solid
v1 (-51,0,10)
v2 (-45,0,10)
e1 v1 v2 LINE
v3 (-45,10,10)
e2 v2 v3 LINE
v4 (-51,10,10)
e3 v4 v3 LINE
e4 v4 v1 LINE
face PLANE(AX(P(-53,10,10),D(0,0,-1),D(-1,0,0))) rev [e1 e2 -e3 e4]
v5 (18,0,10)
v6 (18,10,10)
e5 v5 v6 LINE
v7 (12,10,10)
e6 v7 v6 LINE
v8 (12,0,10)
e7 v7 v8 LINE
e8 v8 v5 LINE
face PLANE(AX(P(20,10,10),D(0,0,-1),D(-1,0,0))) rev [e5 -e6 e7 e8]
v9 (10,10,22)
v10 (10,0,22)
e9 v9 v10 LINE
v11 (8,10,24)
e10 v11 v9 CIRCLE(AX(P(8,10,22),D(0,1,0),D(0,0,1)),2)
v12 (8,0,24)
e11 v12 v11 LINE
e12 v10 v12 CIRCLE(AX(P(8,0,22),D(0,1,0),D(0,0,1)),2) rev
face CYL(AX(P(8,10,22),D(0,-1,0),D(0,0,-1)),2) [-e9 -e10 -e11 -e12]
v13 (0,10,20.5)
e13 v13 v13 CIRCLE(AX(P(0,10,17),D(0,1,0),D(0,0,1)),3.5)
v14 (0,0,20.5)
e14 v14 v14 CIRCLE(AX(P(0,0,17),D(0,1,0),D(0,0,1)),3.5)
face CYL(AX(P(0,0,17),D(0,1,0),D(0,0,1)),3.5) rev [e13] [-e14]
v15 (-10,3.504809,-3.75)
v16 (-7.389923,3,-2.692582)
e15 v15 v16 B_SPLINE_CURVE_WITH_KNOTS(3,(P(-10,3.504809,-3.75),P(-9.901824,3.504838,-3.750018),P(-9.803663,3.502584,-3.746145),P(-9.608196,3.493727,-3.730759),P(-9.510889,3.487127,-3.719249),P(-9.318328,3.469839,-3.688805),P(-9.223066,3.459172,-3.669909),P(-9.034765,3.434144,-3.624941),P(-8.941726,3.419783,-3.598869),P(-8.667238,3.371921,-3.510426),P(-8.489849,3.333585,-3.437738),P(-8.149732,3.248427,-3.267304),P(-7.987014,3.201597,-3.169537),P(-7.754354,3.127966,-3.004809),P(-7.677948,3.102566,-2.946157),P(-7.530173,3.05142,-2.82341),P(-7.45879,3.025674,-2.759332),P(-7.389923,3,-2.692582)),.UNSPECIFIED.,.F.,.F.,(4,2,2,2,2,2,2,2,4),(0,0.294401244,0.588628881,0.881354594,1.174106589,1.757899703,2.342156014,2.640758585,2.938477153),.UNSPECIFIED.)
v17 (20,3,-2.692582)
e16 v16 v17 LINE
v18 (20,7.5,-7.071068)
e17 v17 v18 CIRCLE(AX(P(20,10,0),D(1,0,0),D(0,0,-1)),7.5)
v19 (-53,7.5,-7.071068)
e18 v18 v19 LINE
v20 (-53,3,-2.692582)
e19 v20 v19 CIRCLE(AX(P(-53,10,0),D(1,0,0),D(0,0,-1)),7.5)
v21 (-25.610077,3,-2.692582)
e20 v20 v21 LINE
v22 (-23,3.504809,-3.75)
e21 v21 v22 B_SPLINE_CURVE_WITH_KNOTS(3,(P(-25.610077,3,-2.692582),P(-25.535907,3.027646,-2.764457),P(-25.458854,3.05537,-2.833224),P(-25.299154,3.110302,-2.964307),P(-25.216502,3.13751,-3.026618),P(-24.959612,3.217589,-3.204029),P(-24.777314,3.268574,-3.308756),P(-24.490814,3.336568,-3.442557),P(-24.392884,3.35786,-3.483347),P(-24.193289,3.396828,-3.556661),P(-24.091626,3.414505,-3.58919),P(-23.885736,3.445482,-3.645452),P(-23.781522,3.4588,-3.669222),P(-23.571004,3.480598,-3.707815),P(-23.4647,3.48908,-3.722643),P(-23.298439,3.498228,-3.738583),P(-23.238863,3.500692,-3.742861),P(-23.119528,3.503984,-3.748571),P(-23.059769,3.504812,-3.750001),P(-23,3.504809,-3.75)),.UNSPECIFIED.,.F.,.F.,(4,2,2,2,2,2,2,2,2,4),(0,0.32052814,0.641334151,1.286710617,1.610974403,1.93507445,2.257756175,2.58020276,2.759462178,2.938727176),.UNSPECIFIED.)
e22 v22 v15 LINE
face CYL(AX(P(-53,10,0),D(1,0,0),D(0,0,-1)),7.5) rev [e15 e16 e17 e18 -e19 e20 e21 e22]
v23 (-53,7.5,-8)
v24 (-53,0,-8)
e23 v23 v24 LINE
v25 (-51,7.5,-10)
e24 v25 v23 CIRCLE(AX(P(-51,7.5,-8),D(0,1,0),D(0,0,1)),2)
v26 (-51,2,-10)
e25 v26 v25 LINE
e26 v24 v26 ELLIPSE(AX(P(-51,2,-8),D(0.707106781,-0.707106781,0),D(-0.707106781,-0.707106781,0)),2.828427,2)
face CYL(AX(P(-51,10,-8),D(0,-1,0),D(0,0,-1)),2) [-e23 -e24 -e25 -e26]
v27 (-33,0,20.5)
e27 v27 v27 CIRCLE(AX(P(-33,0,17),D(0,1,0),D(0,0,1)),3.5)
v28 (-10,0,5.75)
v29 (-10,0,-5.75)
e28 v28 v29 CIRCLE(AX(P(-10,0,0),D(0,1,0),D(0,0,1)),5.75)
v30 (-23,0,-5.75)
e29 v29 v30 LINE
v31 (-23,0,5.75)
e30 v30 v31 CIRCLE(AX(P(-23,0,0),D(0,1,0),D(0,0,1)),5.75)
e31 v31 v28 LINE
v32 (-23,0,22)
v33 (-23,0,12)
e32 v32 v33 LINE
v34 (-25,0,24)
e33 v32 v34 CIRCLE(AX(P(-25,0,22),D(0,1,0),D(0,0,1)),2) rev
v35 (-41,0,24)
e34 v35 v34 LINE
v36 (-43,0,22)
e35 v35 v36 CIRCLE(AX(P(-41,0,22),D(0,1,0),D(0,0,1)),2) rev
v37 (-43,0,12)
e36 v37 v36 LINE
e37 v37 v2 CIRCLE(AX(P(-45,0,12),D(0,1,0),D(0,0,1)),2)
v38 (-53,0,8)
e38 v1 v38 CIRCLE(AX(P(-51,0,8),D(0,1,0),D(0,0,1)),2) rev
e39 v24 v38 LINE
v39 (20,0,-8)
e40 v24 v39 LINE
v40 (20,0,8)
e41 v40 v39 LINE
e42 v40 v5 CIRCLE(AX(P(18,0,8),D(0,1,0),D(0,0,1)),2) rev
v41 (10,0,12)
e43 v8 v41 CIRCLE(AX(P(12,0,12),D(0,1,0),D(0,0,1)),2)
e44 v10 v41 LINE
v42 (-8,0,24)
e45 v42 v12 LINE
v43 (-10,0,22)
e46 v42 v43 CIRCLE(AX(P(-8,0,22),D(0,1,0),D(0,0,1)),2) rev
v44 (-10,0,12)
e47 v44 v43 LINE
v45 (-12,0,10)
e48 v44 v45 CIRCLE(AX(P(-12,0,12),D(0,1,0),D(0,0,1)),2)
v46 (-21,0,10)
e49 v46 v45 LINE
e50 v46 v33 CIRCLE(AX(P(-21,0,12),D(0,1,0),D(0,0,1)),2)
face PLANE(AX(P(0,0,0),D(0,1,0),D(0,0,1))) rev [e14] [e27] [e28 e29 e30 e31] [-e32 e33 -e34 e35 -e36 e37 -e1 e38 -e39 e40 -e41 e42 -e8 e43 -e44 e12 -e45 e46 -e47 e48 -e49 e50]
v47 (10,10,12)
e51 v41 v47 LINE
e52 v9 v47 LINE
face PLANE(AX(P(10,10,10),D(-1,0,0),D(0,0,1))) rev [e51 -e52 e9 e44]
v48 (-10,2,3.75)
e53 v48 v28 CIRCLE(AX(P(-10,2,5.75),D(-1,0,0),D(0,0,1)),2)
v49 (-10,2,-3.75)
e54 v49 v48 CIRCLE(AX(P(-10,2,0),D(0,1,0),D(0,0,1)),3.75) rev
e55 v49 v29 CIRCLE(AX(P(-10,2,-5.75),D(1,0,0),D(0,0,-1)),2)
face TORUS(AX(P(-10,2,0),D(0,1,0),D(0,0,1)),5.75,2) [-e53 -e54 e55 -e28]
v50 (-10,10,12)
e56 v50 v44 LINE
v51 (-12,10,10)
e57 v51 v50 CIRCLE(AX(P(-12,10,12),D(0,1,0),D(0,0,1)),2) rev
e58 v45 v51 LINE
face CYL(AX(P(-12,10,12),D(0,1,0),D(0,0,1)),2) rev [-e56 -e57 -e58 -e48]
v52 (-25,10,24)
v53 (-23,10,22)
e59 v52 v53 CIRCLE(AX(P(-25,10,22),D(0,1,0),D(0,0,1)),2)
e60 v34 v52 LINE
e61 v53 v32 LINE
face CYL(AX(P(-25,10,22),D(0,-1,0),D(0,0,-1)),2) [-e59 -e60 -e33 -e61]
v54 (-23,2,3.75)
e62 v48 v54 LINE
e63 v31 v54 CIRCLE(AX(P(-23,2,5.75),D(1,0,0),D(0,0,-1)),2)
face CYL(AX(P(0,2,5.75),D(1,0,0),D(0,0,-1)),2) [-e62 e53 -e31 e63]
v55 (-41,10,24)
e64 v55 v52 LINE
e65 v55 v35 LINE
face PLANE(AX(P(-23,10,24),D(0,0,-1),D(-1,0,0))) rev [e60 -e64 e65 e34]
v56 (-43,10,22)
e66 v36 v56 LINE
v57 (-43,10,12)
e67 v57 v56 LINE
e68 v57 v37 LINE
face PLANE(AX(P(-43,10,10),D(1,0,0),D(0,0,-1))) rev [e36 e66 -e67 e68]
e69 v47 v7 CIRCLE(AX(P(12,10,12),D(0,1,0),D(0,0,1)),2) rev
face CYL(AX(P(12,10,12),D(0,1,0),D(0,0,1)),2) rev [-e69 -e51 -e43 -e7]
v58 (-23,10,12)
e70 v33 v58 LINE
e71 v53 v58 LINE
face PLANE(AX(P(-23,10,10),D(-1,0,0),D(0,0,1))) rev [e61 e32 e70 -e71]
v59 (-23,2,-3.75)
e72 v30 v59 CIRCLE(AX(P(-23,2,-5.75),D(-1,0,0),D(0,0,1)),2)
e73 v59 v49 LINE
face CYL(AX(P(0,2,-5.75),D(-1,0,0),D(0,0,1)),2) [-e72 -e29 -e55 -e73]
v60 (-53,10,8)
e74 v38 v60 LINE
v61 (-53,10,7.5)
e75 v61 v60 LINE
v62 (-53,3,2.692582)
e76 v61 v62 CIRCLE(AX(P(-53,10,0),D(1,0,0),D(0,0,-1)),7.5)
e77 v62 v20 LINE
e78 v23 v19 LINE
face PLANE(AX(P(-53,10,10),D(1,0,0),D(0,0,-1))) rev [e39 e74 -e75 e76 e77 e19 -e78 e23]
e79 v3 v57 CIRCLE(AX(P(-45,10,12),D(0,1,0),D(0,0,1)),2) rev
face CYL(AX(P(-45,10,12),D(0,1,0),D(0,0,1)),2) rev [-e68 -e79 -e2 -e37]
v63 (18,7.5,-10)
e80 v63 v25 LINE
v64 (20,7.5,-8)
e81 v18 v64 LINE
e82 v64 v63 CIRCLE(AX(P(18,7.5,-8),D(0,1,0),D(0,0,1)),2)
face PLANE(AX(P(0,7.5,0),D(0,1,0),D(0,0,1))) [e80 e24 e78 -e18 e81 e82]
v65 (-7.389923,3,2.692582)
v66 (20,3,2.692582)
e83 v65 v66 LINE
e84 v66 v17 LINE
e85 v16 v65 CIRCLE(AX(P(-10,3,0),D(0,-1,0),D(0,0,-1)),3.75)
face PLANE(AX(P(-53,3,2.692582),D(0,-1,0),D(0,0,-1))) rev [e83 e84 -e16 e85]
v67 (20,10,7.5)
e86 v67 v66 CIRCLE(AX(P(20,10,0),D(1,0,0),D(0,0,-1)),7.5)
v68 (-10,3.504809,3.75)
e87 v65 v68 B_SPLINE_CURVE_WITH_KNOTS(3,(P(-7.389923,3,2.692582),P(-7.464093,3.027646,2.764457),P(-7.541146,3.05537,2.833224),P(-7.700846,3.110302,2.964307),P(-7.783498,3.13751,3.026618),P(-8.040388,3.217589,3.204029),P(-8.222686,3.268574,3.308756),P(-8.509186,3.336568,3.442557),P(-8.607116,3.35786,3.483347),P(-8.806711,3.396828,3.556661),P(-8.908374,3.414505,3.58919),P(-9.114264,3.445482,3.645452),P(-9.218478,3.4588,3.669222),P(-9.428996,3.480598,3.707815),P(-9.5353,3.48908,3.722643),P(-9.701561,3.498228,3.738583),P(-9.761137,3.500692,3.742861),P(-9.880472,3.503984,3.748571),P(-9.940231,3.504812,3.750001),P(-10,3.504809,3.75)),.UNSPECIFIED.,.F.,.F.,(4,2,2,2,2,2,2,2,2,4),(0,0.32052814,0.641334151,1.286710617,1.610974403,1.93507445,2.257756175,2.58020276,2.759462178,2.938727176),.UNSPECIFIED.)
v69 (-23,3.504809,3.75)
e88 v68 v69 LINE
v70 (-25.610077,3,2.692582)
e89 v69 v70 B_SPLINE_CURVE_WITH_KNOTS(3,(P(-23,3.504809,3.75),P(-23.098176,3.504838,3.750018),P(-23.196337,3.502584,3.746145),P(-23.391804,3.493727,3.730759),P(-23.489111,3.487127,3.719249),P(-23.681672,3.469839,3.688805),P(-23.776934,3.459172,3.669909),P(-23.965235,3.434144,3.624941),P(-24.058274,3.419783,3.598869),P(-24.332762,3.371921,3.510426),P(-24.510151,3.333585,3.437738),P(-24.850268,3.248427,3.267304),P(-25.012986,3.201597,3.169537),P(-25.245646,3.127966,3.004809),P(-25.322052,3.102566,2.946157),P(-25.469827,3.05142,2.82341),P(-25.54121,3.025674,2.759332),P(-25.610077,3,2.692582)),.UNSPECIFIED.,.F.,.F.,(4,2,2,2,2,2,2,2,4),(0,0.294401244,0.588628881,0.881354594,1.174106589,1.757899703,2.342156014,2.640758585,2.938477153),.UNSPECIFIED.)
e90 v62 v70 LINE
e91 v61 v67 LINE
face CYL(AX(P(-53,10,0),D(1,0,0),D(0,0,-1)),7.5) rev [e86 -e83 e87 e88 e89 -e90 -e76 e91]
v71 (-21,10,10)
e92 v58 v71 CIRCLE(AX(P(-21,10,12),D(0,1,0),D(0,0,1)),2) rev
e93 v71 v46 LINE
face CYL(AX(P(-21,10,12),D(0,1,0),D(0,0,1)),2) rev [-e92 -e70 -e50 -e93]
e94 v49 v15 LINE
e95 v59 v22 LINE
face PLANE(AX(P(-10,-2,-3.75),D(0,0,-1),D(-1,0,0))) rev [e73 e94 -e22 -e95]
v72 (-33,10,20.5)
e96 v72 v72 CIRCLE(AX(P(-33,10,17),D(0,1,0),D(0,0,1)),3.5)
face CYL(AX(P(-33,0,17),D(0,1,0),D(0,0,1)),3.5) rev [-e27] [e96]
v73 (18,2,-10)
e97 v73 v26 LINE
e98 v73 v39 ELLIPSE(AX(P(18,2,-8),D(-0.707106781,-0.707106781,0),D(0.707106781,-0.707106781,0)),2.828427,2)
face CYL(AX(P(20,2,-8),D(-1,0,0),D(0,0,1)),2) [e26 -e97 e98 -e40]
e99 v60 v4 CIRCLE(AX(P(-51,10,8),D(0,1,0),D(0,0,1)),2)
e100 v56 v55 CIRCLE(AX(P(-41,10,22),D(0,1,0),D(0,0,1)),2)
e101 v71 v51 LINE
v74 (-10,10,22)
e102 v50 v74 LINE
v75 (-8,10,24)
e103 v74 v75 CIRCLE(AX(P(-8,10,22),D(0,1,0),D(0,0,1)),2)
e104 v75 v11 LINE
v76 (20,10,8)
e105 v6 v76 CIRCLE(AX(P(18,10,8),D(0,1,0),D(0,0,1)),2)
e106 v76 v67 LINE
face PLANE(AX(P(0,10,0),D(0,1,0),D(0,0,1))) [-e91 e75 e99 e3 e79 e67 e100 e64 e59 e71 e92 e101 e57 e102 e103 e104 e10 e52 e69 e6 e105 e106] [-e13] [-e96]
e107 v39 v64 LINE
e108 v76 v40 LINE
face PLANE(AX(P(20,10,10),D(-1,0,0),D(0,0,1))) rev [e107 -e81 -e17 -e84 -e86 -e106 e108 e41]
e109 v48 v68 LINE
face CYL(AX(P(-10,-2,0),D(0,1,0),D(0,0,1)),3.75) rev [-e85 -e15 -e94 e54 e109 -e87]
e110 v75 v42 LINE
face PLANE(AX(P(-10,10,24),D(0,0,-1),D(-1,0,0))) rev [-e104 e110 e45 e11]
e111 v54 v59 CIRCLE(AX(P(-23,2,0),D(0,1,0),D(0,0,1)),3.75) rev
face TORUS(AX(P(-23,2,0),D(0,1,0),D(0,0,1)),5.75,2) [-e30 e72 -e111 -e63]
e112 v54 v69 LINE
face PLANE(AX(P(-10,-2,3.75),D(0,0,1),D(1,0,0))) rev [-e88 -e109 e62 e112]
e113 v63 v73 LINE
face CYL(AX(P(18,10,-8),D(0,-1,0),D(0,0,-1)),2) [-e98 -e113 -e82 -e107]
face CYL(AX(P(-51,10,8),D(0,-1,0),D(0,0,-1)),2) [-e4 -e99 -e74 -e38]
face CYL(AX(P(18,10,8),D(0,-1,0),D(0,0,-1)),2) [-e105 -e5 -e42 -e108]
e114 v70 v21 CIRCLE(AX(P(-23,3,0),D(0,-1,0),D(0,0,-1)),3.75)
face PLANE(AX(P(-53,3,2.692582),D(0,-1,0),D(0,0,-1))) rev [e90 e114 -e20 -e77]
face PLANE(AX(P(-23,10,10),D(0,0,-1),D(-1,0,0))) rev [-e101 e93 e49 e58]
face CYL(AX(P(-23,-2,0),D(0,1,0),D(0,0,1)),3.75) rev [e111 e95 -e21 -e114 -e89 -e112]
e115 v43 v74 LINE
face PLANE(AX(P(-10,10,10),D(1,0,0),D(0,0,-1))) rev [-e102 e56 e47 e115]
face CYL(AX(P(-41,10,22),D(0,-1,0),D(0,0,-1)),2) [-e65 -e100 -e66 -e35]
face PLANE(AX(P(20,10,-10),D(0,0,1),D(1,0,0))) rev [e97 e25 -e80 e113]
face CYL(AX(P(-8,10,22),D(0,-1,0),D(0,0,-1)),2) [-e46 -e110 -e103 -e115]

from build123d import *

# Parameters (mm, degrees)
BOSS_EXTRUDE1_DEPTH       = 10
SKETCH2_R                 = 3.5
CUT_EXTRUDE1_DEPTH        = 10
CUT_EXTRUDE2_DEPTH        = 78.491935064
FILLET1_R                 = 2
MOVE_START                = 7.5
MOVE_FACE1_DEPTH          = 2.5
USB_C_CHARGE_ACCESS_DEPTH = 5
FILLET3_R                 = 2


# Read off the part's stored shape, not the designer's step: Move Face1
with BuildPart() as part:
    # Sketch1 → Boss-Extrude1 (new body)
    with BuildSketch(Plane(origin=(0, 0, 0), x_dir=(1, 0, 0), z_dir=(0, 1, 0))):
        Polygon((20, -10), (10, -10), (10, -24), (-10, -24), (-10, -10), (-23, -10), (-23, -24), (-43, -24), (-43, -10), (-53, -10), (-53, 10), (20, 10), align=None)
    extrude(amount=BOSS_EXTRUDE1_DEPTH)

    # Sketch2 → Cut-Extrude1 (cut)
    with BuildSketch(Plane(origin=(0, 10, 0), x_dir=(1, 0, 0), z_dir=(0, 1, 0))):
        with Locations(Location((0, -17, 0), (0, 0, 270))):
            Circle(SKETCH2_R)
        with Locations(Location((-33, -17, 0), (0, 0, 270))):
            Circle(SKETCH2_R)
    extrude(amount=-CUT_EXTRUDE1_DEPTH, mode=Mode.SUBTRACT)

    # Sketch3 → Cut-Extrude2 (cut, through all)
    with BuildSketch(Plane(origin=(20, 0, 0), x_dir=(0, 0, -1), z_dir=(1, 0, 0))):
        with BuildLine():
            Line((-2.692582404, 3), (2.692582404, 3))
            ThreePointArc((2.692582404, 3), (0, 17.5), (-2.692582404, 3))
        make_face()
    extrude(amount=-CUT_EXTRUDE2_DEPTH, mode=Mode.SUBTRACT)

    # Fillet1
    fillet1_edges = [part.edges().sort_by_distance(p)[0] for p in [
        (-16.5, 0, -10),
        (20, 5, 10),
        (10, 5, 10),
        (10, 5, 24),
        (-10, 5, 24),
        (-10, 5, 10),
        (-23, 5, 10),
        (-23, 5, 24),
        (-43, 5, 24),
        (-43, 5, 10),
        (-53, 5, 10),
        (-53, 5, -10),
        (20, 5, -10),
    ]]
    fillet(fillet1_edges, radius=FILLET1_R)

    # Move Face1 outline → Move Face1 (cut)
    with BuildSketch(Plane(origin=(0, 0, 0), x_dir=(1, 0, 0), z_dir=(0, 1, 0)).offset(MOVE_START)):
        with BuildLine():
            Line((18, 10), (-51, 10))
            ThreePointArc((-51, 10), (-52.414213562, 9.414213562), (-53, 8))
            Line((-53, 8), (-53.000000001, 6))
            Line((-53.000000001, 6), (20.000000001, 6))
            Line((20.000000001, 6), (20, 8))
            ThreePointArc((20, 8), (19.414213562, 9.414213562), (18, 10))
        make_face()
    extrude(amount=MOVE_FACE1_DEPTH, mode=Mode.SUBTRACT)

    # Sketch4 → USB-C charge access (cut, symmetric)
    with BuildSketch(Plane(origin=(0, 3, 0), x_dir=(1, 0, 0), z_dir=(0, 1, 0))):
        with BuildLine():
            Line((-10, -3.75), (-23, -3.75))
            ThreePointArc((-23, -3.75), (-26.75, 0), (-23, 3.75))
            Line((-23, 3.75), (-10, 3.75))
            ThreePointArc((-10, 3.75), (-6.25, 0), (-10, -3.75))
        make_face()
    extrude(amount=USB_C_CHARGE_ACCESS_DEPTH, both=True, mode=Mode.SUBTRACT)

    # Fillet3
    fillet3_edges = [part.edges().sort_by_distance(p)[0] for p in [
        (-16.5, 0, 3.75),
        (-16.5, 0, -3.75),
        (-6.25, 0, 0),
        (-26.75, 0, 0),
    ]]
    fillet(fillet3_edges, radius=FILLET3_R)


solid = part.part
